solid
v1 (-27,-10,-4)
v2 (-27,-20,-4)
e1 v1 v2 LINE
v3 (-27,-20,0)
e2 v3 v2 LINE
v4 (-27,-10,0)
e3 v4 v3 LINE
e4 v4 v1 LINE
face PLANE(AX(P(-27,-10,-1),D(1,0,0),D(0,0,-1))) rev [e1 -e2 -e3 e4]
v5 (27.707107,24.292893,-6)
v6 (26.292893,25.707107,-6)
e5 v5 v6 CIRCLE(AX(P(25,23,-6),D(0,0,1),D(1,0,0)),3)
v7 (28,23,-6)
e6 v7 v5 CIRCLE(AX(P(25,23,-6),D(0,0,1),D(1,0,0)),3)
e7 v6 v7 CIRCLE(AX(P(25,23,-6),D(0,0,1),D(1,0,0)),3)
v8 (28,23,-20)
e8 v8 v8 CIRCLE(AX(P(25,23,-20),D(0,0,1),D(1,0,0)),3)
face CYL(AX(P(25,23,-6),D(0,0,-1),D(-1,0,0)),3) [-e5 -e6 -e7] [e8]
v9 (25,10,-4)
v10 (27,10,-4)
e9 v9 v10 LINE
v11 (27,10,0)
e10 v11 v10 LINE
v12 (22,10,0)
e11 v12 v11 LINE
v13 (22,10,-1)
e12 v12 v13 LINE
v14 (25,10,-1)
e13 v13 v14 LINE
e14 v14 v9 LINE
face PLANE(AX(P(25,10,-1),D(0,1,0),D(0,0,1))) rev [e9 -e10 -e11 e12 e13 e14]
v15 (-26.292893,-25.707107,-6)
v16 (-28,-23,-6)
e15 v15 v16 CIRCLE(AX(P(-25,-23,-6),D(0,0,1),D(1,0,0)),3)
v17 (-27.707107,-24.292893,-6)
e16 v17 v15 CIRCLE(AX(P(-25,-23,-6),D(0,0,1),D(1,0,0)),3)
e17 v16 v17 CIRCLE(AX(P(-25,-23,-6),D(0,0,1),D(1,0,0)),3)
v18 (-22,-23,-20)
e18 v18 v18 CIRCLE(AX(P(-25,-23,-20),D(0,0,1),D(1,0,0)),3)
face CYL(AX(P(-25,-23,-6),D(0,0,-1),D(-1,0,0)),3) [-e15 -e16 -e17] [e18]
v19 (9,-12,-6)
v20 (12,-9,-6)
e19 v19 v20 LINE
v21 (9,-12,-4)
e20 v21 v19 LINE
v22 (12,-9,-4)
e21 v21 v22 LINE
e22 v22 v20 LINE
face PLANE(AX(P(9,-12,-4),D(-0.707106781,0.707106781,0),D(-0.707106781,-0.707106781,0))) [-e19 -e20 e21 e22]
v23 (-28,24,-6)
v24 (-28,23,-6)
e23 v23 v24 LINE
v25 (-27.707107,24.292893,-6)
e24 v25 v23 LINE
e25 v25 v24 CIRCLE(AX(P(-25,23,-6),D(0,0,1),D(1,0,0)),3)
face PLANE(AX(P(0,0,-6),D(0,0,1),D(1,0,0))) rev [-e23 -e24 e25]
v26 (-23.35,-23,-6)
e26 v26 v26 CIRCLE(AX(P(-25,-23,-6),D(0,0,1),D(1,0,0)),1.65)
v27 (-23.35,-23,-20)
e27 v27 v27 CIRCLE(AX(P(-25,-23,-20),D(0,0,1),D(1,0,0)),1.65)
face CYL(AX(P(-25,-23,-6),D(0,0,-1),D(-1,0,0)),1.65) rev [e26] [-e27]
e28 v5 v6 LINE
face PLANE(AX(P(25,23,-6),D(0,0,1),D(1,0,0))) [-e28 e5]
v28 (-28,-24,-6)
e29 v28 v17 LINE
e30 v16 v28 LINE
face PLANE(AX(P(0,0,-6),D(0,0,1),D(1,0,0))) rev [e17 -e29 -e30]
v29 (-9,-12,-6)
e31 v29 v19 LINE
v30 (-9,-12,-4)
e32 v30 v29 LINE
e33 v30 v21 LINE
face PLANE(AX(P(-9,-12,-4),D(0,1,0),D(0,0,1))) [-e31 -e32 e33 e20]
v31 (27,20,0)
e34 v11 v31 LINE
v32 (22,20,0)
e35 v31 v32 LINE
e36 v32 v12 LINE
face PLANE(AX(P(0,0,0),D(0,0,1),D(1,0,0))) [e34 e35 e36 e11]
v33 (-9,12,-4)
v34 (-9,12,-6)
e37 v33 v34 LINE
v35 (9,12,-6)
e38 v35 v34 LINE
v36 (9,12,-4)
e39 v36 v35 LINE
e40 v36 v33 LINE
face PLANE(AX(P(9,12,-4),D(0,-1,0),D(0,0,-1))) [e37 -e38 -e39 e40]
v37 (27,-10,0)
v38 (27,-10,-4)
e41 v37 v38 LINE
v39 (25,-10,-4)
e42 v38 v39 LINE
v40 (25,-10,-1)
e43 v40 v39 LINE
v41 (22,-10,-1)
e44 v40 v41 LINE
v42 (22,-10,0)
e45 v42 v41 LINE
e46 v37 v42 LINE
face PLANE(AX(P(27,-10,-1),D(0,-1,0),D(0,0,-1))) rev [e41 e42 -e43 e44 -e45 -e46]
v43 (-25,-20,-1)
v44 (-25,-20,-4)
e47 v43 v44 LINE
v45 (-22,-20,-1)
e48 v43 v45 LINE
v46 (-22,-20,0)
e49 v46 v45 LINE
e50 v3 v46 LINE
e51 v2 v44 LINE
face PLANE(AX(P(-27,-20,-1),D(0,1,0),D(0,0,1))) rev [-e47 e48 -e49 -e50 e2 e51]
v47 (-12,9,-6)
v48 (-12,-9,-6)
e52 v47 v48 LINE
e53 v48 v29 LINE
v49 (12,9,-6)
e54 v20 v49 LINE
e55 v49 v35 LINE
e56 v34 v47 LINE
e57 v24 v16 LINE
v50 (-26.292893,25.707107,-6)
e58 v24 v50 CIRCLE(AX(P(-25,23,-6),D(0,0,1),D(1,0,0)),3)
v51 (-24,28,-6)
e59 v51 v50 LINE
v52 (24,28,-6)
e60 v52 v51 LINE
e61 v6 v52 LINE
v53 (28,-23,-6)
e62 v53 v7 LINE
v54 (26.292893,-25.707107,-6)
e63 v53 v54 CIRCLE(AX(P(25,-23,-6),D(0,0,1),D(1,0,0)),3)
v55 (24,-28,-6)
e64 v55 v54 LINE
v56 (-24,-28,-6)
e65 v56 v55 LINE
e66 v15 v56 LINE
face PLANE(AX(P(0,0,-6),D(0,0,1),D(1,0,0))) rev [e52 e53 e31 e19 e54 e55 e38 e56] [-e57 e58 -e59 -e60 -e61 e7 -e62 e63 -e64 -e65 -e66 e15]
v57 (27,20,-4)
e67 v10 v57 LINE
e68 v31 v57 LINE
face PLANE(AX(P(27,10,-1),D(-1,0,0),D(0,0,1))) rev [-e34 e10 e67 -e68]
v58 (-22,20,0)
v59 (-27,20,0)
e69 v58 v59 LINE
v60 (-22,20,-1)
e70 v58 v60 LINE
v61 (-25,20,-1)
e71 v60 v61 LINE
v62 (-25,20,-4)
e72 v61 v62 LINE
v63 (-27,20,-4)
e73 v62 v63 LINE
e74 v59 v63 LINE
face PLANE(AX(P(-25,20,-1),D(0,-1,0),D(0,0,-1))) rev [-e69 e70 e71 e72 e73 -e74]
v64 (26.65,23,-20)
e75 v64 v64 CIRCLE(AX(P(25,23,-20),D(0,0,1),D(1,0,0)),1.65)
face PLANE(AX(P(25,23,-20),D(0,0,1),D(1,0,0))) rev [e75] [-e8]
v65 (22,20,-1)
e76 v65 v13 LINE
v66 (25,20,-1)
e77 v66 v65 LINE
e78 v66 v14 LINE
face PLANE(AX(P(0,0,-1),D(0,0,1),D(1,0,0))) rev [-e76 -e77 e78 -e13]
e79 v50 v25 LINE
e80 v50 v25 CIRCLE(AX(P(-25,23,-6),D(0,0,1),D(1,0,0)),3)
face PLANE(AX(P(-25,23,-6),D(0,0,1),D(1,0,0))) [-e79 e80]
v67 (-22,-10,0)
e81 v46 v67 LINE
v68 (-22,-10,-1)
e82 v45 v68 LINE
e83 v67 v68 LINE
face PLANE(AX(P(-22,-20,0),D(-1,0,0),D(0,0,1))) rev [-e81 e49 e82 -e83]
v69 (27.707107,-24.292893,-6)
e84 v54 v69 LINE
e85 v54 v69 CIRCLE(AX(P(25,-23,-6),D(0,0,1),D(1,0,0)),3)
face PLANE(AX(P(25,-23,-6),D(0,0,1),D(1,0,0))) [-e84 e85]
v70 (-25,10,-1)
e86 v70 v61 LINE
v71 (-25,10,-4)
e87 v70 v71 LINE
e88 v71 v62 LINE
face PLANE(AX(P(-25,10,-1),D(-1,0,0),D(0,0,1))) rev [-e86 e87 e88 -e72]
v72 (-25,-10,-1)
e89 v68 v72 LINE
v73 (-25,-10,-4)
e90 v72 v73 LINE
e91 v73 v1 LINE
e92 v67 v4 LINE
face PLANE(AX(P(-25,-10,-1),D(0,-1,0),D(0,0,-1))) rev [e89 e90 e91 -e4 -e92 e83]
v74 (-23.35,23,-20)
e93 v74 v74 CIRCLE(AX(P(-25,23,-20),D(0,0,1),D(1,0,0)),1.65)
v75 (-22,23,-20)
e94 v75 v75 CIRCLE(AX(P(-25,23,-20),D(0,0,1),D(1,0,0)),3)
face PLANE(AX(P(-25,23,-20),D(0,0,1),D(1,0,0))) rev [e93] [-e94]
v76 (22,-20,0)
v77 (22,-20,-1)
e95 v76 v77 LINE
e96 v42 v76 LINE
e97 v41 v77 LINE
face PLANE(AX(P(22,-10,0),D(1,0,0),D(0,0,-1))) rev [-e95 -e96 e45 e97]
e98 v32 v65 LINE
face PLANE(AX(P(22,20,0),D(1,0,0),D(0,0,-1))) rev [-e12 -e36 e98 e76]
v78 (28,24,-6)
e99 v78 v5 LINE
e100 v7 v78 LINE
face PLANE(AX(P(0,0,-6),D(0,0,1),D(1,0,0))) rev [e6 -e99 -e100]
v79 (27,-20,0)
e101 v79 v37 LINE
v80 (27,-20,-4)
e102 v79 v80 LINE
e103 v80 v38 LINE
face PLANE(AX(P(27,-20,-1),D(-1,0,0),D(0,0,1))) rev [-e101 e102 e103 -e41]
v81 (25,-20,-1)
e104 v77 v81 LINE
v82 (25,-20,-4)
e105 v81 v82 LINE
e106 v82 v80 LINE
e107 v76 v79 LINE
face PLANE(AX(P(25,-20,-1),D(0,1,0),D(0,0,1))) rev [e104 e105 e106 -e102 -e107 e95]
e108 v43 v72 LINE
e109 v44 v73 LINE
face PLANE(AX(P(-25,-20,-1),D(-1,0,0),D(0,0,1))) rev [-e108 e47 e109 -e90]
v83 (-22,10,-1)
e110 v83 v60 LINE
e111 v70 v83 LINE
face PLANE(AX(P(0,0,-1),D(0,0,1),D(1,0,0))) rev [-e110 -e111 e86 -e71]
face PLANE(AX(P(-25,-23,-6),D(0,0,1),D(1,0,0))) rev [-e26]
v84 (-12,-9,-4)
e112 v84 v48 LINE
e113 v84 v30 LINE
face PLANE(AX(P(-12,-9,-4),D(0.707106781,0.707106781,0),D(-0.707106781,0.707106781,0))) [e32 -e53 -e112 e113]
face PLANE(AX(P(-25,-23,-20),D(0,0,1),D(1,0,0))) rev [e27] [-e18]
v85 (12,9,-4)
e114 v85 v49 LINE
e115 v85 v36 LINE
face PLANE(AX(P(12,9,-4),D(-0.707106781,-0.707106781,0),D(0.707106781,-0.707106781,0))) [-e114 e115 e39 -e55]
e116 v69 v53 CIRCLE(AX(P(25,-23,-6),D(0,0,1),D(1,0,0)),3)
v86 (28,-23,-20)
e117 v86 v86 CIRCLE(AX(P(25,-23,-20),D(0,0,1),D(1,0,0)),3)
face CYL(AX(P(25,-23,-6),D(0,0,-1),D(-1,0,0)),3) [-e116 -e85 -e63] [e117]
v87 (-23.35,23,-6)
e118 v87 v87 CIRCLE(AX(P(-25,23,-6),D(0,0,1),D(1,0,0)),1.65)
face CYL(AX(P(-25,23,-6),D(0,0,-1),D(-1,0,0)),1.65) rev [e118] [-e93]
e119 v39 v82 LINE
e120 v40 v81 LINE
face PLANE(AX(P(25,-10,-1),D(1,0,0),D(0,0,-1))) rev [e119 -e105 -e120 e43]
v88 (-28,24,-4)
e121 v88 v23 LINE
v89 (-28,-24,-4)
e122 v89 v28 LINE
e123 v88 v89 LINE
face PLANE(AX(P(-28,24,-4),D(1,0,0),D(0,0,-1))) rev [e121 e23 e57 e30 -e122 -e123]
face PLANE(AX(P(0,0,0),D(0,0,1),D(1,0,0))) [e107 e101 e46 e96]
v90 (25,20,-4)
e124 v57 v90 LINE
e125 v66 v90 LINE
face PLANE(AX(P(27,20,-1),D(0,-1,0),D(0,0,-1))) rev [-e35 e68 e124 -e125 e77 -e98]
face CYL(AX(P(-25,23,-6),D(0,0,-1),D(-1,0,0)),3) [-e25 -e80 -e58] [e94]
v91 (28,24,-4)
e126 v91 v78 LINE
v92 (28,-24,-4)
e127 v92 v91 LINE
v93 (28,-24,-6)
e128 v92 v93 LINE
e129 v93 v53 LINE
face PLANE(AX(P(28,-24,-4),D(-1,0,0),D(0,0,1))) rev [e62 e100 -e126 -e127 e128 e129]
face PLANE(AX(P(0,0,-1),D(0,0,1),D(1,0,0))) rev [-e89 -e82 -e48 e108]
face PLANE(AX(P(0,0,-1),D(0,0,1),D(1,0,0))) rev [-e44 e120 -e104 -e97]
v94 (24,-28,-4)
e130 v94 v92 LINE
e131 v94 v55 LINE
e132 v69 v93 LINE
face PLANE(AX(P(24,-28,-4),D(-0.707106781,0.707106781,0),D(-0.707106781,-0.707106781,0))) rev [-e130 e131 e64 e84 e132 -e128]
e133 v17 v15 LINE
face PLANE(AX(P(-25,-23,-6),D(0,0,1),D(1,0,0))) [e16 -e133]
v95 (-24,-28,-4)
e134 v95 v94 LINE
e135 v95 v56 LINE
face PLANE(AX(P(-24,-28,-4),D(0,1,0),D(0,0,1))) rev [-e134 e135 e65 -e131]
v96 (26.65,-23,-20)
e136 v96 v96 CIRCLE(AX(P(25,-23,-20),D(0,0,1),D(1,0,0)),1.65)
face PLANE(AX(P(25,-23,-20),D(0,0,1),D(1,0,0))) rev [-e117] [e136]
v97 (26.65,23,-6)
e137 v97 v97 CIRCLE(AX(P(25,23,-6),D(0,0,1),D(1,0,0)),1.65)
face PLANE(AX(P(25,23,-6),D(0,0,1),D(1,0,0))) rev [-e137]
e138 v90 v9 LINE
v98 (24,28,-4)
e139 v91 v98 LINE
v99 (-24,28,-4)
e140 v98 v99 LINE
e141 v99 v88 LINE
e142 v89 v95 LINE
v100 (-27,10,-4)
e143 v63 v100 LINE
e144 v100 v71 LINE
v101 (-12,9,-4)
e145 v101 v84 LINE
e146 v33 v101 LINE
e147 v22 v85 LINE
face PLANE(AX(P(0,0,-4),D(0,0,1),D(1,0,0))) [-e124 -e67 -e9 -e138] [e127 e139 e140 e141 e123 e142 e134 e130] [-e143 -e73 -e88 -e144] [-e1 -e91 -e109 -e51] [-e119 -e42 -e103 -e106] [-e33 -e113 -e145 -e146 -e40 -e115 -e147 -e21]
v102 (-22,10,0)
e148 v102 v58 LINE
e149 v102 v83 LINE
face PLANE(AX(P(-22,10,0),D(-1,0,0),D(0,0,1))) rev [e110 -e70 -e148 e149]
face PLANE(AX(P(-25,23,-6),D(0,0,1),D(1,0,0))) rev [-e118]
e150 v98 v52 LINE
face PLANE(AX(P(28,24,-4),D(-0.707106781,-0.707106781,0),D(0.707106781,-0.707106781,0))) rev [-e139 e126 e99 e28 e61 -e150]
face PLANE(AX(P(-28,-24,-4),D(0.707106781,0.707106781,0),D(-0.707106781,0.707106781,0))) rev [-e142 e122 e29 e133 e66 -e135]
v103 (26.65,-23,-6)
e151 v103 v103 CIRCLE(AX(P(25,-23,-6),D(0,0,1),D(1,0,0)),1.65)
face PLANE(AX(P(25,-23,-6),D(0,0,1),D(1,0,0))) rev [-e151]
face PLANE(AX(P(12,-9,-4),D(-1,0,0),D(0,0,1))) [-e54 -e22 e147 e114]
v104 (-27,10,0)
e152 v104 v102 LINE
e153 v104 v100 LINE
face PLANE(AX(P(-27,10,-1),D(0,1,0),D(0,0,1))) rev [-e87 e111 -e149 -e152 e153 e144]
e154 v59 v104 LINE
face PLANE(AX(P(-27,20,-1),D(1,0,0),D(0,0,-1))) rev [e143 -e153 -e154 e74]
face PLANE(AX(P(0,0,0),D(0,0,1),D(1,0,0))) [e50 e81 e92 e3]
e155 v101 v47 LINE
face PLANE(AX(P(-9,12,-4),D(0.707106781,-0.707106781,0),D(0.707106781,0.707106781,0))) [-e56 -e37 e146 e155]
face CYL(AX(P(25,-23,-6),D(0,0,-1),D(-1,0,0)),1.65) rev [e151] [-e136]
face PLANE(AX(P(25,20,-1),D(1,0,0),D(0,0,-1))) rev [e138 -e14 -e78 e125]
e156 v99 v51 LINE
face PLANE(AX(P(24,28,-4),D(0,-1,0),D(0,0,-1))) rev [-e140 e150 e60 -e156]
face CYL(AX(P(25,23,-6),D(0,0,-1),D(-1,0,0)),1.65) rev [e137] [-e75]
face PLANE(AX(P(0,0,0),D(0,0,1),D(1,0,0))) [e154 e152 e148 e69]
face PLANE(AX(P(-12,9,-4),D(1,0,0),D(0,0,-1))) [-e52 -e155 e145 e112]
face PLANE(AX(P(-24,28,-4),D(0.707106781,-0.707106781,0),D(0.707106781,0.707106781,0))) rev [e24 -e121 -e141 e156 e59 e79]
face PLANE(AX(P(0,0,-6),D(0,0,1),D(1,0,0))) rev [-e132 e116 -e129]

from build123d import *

# Parameters (mm, degrees)
EXTRUDE_START              = -6
EXTRUDE_275_DEPTH          = 2
EXTRUDE_START_2            = -20
SKETCH_2_R                 = 3
EXTRUDE_1_1_DEPTH          = 14
CUT_EXTRUDE_START          = -20
SKETCH_3_R                 = 1.65
CUT_EXTRUDE_M3_1_1_DEPTH   = 14
EXTRUDE_START_3            = -4
SKETCH_4_W                 = 2
SKETCH_4_H                 = 10
EXTRUDE_1_1_2_DEPTH        = 3
EXTRUDE_START_4            = -1
SKETCH_5_W                 = 5
SKETCH_5_H                 = 10
EXTRUDE_1_1_3_DEPTH        = 1
SKETCH_6_R                 = 3
EXTRUDE_1_1_4_DEPTH        = 14
SKETCH_7_R                 = 1.65
CUT_EXTRUDE_M3_1_1_2_DEPTH = 14
SKETCH_8_W                 = 2
SKETCH_8_H                 = 10
EXTRUDE_1_1_5_DEPTH        = 3
SKETCH_9_W                 = 5
SKETCH_9_H                 = 10
EXTRUDE_1_1_6_DEPTH        = 1
SKETCH_10_R                = 3
EXTRUDE_1_1_7_DEPTH        = 14
SKETCH_11_R                = 1.65
CUT_EXTRUDE_M3_1_1_3_DEPTH = 14
SKETCH_12_W                = 2
SKETCH_12_H                = 10
EXTRUDE_1_1_8_DEPTH        = 3
SKETCH_13_W                = 5
SKETCH_13_H                = 10
EXTRUDE_1_1_9_DEPTH        = 1
SKETCH_14_R                = 3
EXTRUDE_1_1_10_DEPTH       = 14
SKETCH_15_R                = 1.65
CUT_EXTRUDE_M3_1_1_4_DEPTH = 14
SKETCH_16_W                = 2
SKETCH_16_H                = 10
EXTRUDE_1_1_11_DEPTH       = 3
SKETCH_17_W                = 5
SKETCH_17_H                = 10
EXTRUDE_1_1_12_DEPTH       = 1


with BuildPart() as part:
    # 草图1 → Extrude 275 (new body)
    with BuildSketch(Plane.XY.offset(EXTRUDE_START)):
        Polygon((-24, -28), (24, -28), (28, -24), (28, 24), (24, 28), (-24, 28), (-28, 24), (-28, -24), align=None)
        Polygon((-9, -12), (9, -12), (12, -9), (12, 9), (9, 12), (-9, 12), (-12, 9), (-12, -9), align=None, mode=Mode.SUBTRACT)
    extrude(amount=EXTRUDE_275_DEPTH)

    # 草图2 → Extrude 1_-1 (add)
    with BuildSketch(Plane.XY.offset(EXTRUDE_START_2)):
        with Locations(Location((-25, -23, 0), (0, 0, 180))):
            Circle(SKETCH_2_R)
    extrude(amount=EXTRUDE_1_1_DEPTH)

    # 草图3 → Cut-Extrude M3__-1_-1 (cut)
    with BuildSketch(Plane.XY.offset(CUT_EXTRUDE_START)):
        with Locations((-25, -23)):
            Circle(SKETCH_3_R)
    extrude(amount=CUT_EXTRUDE_M3_1_1_DEPTH, mode=Mode.SUBTRACT)

    # 草图4 → Extrude 1_-1 2 (add)
    with BuildSketch(Plane.XY.offset(EXTRUDE_START_3)):
        with Locations((-26, -15)):
            Rectangle(SKETCH_4_W, SKETCH_4_H)
    extrude(amount=EXTRUDE_1_1_2_DEPTH)

    # 草图5 → Extrude 1_-1 3 (add)
    with BuildSketch(Plane.XY.offset(EXTRUDE_START_4)):
        with Locations((-24.5, -15)):
            Rectangle(SKETCH_5_W, SKETCH_5_H)
    extrude(amount=EXTRUDE_1_1_3_DEPTH)

    # 草图6 → Extrude 1_1 4 (add)
    with BuildSketch(Plane.XY.offset(EXTRUDE_START_2)):
        with Locations(Location((-25, 23, 0), (0, 0, 180))):
            Circle(SKETCH_6_R)
    extrude(amount=EXTRUDE_1_1_4_DEPTH)

    # 草图7 → Cut-Extrude M3__-1_1 2 (cut)
    with BuildSketch(Plane.XY.offset(CUT_EXTRUDE_START)):
        with Locations((-25, 23)):
            Circle(SKETCH_7_R)
    extrude(amount=CUT_EXTRUDE_M3_1_1_2_DEPTH, mode=Mode.SUBTRACT)

    # 草图8 → Extrude 1_1 5 (add)
    with BuildSketch(Plane.XY.offset(EXTRUDE_START_3)):
        with Locations((-26, 15)):
            Rectangle(SKETCH_8_W, SKETCH_8_H)
    extrude(amount=EXTRUDE_1_1_5_DEPTH)

    # 草图9 → Extrude 1_1 6 (add)
    with BuildSketch(Plane.XY.offset(EXTRUDE_START_4)):
        with Locations((-24.5, 15)):
            Rectangle(SKETCH_9_W, SKETCH_9_H)
    extrude(amount=EXTRUDE_1_1_6_DEPTH)

    # 草图10 → Extrude 1_-1 7 (add)
    with BuildSketch(Plane.XY.offset(EXTRUDE_START_2)):
        with Locations((25, -23)):
            Circle(SKETCH_10_R)
    extrude(amount=EXTRUDE_1_1_7_DEPTH)

    # 草图11 → Cut-Extrude M3__1_-1 3 (cut)
    with BuildSketch(Plane.XY.offset(CUT_EXTRUDE_START)):
        with Locations((25, -23)):
            Circle(SKETCH_11_R)
    extrude(amount=CUT_EXTRUDE_M3_1_1_3_DEPTH, mode=Mode.SUBTRACT)

    # 草图12 → Extrude 1_-1 8 (add)
    with BuildSketch(Plane.XY.offset(EXTRUDE_START_3)):
        with Locations((26, -15)):
            Rectangle(SKETCH_12_W, SKETCH_12_H)
    extrude(amount=EXTRUDE_1_1_8_DEPTH)

    # 草图13 → Extrude 1_-1 9 (add)
    with BuildSketch(Plane.XY.offset(EXTRUDE_START_4)):
        with Locations((24.5, -15)):
            Rectangle(SKETCH_13_W, SKETCH_13_H)
    extrude(amount=EXTRUDE_1_1_9_DEPTH)

    # 草图14 → Extrude 1_1 10 (add)
    with BuildSketch(Plane.XY.offset(EXTRUDE_START_2)):
        with Locations((25, 23)):
            Circle(SKETCH_14_R)
    extrude(amount=EXTRUDE_1_1_10_DEPTH)

    # 草图15 → Cut-Extrude M3__1_1 4 (cut)
    with BuildSketch(Plane.XY.offset(CUT_EXTRUDE_START)):
        with Locations((25, 23)):
            Circle(SKETCH_15_R)
    extrude(amount=CUT_EXTRUDE_M3_1_1_4_DEPTH, mode=Mode.SUBTRACT)

    # 草图16 → Extrude 1_1 11 (add)
    with BuildSketch(Plane.XY.offset(EXTRUDE_START_3)):
        with Locations((26, 15)):
            Rectangle(SKETCH_16_W, SKETCH_16_H)
    extrude(amount=EXTRUDE_1_1_11_DEPTH)

    # 草图17 → Extrude 1_1 12 (add)
    with BuildSketch(Plane.XY.offset(EXTRUDE_START_4)):
        with Locations((24.5, 15)):
            Rectangle(SKETCH_17_W, SKETCH_17_H)
    extrude(amount=EXTRUDE_1_1_12_DEPTH)


solid = part.part
